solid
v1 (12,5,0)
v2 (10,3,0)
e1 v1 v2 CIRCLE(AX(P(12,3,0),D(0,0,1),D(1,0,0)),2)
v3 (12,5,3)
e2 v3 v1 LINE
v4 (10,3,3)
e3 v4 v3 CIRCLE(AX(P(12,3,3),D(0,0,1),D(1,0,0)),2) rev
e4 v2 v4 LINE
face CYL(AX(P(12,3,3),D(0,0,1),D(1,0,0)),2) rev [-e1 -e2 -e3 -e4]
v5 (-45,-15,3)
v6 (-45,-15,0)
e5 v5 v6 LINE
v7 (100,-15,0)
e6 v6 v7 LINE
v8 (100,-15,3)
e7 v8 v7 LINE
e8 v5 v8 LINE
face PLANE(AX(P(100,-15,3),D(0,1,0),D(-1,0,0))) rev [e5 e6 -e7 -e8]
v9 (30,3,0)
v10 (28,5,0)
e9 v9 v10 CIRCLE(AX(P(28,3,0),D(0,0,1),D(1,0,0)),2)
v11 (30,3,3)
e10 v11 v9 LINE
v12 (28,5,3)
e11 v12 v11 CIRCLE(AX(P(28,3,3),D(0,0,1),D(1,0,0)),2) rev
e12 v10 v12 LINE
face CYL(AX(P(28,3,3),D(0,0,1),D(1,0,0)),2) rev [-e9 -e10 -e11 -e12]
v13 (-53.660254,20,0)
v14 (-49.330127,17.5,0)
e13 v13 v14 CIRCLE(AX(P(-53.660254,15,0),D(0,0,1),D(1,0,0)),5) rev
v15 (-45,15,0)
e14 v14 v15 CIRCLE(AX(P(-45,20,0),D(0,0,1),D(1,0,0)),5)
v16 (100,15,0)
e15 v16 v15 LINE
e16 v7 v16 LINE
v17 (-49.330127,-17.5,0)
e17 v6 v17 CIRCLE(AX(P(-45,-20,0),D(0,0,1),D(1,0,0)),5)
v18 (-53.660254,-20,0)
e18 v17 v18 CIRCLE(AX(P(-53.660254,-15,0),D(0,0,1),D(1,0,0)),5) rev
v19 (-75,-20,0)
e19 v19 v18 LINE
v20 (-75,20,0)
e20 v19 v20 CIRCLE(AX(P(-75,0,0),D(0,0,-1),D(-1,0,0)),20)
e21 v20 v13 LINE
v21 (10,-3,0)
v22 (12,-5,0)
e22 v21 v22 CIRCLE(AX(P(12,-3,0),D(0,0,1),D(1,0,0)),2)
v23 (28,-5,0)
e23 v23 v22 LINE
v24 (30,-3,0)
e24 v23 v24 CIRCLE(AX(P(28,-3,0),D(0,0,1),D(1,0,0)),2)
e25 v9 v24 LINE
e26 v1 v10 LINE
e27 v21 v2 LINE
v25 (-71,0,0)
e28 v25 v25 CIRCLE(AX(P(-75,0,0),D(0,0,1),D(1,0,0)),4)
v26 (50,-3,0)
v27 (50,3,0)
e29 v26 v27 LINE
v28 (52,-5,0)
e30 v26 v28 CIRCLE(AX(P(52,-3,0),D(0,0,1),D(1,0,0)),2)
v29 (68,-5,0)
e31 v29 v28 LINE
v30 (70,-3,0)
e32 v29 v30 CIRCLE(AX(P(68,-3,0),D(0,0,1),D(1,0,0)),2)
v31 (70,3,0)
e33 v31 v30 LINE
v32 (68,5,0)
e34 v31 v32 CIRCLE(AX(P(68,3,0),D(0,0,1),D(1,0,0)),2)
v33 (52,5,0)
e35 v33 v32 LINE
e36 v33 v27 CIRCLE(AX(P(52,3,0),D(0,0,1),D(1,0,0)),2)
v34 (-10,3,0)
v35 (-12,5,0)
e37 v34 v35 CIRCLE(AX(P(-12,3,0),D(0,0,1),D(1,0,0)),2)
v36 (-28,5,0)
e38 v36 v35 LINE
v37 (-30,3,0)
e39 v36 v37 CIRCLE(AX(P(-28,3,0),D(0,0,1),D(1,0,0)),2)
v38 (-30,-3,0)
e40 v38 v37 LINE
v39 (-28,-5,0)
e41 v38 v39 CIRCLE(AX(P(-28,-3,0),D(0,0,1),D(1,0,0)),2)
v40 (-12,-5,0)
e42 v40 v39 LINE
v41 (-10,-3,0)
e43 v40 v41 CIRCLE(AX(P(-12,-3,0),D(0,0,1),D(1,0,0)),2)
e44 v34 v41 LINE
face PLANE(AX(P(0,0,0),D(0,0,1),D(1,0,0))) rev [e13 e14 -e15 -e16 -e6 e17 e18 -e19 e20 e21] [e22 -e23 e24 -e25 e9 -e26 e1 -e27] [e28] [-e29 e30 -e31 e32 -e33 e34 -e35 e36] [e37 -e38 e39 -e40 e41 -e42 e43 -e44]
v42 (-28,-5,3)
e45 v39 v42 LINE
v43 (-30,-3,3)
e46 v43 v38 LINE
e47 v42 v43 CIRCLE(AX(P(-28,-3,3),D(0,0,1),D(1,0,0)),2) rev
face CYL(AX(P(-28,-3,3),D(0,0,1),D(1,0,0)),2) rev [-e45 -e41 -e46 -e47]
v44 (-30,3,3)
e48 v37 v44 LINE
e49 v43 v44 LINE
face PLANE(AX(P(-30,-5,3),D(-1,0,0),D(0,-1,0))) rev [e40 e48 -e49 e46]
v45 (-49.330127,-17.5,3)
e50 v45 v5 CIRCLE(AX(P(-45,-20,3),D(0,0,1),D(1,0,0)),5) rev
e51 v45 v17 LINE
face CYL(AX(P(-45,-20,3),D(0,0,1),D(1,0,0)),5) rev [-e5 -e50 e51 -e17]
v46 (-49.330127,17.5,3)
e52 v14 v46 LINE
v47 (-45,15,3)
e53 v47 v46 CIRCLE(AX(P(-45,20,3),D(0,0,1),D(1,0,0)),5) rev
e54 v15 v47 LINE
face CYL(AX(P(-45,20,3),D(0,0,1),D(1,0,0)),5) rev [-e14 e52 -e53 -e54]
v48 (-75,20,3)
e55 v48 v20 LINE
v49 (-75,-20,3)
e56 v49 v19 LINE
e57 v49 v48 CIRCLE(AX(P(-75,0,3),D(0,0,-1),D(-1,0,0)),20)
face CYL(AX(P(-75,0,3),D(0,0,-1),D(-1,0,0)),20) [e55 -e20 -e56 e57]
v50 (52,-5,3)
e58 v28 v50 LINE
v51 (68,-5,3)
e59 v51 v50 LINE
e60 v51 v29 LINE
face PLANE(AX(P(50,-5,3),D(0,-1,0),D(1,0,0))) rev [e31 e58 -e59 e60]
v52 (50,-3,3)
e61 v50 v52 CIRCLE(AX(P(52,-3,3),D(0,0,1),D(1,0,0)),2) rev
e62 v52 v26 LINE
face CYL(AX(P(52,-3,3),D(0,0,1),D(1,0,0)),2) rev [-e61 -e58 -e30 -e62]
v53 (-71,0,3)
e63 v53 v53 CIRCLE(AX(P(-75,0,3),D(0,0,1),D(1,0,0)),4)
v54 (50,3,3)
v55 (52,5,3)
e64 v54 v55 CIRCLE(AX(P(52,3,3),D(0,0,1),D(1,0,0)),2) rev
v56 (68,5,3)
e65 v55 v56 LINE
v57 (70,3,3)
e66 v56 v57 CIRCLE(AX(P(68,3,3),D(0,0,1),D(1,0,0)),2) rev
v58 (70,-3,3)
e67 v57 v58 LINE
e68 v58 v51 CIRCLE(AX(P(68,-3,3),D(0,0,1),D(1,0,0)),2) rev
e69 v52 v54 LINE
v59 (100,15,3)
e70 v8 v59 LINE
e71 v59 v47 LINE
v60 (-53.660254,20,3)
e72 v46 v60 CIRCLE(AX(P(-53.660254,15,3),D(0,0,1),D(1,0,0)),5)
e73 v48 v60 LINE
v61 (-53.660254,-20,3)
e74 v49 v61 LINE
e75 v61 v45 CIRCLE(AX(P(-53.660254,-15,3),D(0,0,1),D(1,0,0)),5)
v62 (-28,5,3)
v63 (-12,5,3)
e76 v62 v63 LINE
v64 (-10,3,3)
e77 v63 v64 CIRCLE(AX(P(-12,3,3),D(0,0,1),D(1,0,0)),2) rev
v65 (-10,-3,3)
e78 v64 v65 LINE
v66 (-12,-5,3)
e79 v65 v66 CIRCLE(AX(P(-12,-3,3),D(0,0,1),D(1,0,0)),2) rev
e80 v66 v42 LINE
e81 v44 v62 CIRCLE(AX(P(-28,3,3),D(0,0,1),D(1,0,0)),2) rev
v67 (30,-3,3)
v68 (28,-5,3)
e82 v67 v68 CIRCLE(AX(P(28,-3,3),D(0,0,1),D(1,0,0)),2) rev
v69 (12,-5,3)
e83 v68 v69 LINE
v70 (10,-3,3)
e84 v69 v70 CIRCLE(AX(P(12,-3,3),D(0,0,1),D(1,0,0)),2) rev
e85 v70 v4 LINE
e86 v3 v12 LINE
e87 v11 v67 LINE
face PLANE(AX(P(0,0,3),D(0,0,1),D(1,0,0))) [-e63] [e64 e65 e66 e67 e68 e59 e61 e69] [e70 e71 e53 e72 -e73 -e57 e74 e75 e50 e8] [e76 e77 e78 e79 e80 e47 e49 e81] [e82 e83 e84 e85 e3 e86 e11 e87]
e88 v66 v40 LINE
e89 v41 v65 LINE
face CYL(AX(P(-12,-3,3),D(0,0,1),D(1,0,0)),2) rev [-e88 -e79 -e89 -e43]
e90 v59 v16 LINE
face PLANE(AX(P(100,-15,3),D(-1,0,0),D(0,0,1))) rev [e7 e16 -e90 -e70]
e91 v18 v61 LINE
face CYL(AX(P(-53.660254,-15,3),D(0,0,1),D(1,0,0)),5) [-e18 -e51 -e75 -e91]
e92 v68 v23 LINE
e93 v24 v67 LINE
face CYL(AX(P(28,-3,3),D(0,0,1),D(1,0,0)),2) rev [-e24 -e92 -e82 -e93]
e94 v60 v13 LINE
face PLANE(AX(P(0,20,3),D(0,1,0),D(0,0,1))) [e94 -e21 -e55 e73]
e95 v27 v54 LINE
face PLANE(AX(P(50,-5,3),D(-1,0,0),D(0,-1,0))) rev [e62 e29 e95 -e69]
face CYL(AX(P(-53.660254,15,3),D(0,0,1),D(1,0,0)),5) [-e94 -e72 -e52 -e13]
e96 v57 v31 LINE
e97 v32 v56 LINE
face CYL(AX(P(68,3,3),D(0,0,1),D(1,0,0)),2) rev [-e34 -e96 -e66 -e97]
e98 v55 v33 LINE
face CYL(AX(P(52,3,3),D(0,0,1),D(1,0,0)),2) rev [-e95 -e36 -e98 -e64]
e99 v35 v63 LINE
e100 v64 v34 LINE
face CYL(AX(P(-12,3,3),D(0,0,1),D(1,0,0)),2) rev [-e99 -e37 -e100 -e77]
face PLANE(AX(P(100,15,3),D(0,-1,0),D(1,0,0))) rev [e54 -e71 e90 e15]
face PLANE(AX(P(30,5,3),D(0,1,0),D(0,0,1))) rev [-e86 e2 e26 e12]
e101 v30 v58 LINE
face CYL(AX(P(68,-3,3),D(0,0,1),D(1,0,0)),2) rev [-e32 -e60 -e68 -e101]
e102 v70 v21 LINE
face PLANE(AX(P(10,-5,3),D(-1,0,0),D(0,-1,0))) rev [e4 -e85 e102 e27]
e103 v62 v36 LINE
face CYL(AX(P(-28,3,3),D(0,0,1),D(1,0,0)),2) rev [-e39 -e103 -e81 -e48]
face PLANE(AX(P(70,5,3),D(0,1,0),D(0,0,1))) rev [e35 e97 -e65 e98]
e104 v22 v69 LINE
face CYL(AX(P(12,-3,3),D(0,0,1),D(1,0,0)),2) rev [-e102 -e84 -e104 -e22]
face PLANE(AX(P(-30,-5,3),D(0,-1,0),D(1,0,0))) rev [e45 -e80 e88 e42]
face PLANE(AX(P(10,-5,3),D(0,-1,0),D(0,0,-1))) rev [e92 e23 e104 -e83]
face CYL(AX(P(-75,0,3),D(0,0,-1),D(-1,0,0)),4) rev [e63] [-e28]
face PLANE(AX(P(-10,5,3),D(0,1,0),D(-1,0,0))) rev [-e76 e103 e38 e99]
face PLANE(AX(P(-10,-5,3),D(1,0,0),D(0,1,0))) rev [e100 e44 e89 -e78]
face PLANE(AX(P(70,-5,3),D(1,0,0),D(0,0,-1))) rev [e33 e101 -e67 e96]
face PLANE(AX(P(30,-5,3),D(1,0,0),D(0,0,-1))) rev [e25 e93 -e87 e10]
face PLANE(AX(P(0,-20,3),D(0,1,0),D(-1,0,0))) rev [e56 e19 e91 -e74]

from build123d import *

# Parameters (mm, degrees)
SKETCH1_R           = 4
BOSS_EXTRUDE1_DEPTH = 3
FILLET1_R           = 5
SKETCH2_W           = 20
SKETCH2_H           = 10
CUT_EXTRUDE1_DEPTH  = 3
FILLET2_R           = 2
CUT_EXTRUDE3_DEPTH  = 3
FILLET4_R           = 5


with BuildPart() as part:
    # Sketch1 → Boss-Extrude1 (new body)
    with BuildSketch(Plane.XY):
        Polygon((-50, -25), (-50, -15), (100, -15), (100, 15), (-50, 15), (-50, 25), (-100, 25), (-100, -25), align=None)
        with Locations((-75, 0)):
            Circle(SKETCH1_R, mode=Mode.SUBTRACT)
    extrude(amount=BOSS_EXTRUDE1_DEPTH)

    # Fillet1
    fillet1_edges = [part.edges().sort_by_distance(p)[0] for p in [
        (-50, -15, 1.5),
        (-50, 15, 1.5),
    ]]
    fillet(fillet1_edges, radius=FILLET1_R)
    fillet1_2_edges = [part.edges().sort_by_distance(p)[0] for p in [
        (-50, -25, 1.5),
        (-50, 25, 1.5),
    ]]
    fillet(fillet1_2_edges, radius=FILLET1_R - 0.0001)  # a hair under: the kernel refuses the full size

    # Sketch2 → Cut-Extrude1 (cut)
    with BuildSketch(Plane(origin=(0, 0, 0), x_dir=(-1, 0, 0), z_dir=(0, 0, -1))):
        with Locations((20, 0)):
            Rectangle(SKETCH2_W, SKETCH2_H)
        with Locations((-20, 0)):
            Rectangle(SKETCH2_W, SKETCH2_H)
        with Locations((-60, 0)):
            Rectangle(SKETCH2_W, SKETCH2_H)
    extrude(amount=-CUT_EXTRUDE1_DEPTH, mode=Mode.SUBTRACT)

    # Fillet2
    fillet2_edges = [part.edges().sort_by_distance(p)[0] for p in [
        (-30, -5, 1.5),
        (-10, -5, 1.5),
        (-10, 5, 1.5),
        (-30, 5, 1.5),
        (30, 5, 1.5),
        (10, 5, 1.5),
        (10, -5, 1.5),
        (30, -5, 1.5),
        (70, 5, 1.5),
        (50, 5, 1.5),
        (50, -5, 1.5),
        (70, -5, 1.5),
    ]]
    fillet(fillet2_edges, radius=FILLET2_R)

    # Sketch3 → Cut-Extrude3 (cut)
    with BuildSketch(Plane(origin=(0, 0, 0), x_dir=(-1, 0, 0), z_dir=(0, 0, -1))):
        with BuildLine():
            ThreePointArc((75, -20), (95, 0), (75, 20))
            Line((75, 20), (50, 20))
            ThreePointArc((50, 20), (51.464466094, 23.535533906), (55, 25))
            Line((55, 25), (100, 25))
            Line((100, 25), (100, -25))
            Line((100, -25), (55, -25))
            ThreePointArc((55, -25), (51.464466094, -23.535533906), (50, -20))
            Line((50, -20), (75, -20))
        make_face()
    extrude(amount=-CUT_EXTRUDE3_DEPTH, mode=Mode.SUBTRACT)


with BuildPart() as cut_extrude3_kept_piece:
    # of the separate pieces the step leaves, the one the design keeps (cut_extrude3_pieces_kept)
    add(part.part.solids().sort_by_distance((-50, -20, 0))[0])

    # Fillet4
    fillet4_edges = [cut_extrude3_kept_piece.edges().sort_by_distance(p)[0] for p in [
        (-50, -20, 1.5),
        (-50, 20, 1.5),
    ]]
    fillet(fillet4_edges, radius=FILLET4_R)


solid = cut_extrude3_kept_piece.part
